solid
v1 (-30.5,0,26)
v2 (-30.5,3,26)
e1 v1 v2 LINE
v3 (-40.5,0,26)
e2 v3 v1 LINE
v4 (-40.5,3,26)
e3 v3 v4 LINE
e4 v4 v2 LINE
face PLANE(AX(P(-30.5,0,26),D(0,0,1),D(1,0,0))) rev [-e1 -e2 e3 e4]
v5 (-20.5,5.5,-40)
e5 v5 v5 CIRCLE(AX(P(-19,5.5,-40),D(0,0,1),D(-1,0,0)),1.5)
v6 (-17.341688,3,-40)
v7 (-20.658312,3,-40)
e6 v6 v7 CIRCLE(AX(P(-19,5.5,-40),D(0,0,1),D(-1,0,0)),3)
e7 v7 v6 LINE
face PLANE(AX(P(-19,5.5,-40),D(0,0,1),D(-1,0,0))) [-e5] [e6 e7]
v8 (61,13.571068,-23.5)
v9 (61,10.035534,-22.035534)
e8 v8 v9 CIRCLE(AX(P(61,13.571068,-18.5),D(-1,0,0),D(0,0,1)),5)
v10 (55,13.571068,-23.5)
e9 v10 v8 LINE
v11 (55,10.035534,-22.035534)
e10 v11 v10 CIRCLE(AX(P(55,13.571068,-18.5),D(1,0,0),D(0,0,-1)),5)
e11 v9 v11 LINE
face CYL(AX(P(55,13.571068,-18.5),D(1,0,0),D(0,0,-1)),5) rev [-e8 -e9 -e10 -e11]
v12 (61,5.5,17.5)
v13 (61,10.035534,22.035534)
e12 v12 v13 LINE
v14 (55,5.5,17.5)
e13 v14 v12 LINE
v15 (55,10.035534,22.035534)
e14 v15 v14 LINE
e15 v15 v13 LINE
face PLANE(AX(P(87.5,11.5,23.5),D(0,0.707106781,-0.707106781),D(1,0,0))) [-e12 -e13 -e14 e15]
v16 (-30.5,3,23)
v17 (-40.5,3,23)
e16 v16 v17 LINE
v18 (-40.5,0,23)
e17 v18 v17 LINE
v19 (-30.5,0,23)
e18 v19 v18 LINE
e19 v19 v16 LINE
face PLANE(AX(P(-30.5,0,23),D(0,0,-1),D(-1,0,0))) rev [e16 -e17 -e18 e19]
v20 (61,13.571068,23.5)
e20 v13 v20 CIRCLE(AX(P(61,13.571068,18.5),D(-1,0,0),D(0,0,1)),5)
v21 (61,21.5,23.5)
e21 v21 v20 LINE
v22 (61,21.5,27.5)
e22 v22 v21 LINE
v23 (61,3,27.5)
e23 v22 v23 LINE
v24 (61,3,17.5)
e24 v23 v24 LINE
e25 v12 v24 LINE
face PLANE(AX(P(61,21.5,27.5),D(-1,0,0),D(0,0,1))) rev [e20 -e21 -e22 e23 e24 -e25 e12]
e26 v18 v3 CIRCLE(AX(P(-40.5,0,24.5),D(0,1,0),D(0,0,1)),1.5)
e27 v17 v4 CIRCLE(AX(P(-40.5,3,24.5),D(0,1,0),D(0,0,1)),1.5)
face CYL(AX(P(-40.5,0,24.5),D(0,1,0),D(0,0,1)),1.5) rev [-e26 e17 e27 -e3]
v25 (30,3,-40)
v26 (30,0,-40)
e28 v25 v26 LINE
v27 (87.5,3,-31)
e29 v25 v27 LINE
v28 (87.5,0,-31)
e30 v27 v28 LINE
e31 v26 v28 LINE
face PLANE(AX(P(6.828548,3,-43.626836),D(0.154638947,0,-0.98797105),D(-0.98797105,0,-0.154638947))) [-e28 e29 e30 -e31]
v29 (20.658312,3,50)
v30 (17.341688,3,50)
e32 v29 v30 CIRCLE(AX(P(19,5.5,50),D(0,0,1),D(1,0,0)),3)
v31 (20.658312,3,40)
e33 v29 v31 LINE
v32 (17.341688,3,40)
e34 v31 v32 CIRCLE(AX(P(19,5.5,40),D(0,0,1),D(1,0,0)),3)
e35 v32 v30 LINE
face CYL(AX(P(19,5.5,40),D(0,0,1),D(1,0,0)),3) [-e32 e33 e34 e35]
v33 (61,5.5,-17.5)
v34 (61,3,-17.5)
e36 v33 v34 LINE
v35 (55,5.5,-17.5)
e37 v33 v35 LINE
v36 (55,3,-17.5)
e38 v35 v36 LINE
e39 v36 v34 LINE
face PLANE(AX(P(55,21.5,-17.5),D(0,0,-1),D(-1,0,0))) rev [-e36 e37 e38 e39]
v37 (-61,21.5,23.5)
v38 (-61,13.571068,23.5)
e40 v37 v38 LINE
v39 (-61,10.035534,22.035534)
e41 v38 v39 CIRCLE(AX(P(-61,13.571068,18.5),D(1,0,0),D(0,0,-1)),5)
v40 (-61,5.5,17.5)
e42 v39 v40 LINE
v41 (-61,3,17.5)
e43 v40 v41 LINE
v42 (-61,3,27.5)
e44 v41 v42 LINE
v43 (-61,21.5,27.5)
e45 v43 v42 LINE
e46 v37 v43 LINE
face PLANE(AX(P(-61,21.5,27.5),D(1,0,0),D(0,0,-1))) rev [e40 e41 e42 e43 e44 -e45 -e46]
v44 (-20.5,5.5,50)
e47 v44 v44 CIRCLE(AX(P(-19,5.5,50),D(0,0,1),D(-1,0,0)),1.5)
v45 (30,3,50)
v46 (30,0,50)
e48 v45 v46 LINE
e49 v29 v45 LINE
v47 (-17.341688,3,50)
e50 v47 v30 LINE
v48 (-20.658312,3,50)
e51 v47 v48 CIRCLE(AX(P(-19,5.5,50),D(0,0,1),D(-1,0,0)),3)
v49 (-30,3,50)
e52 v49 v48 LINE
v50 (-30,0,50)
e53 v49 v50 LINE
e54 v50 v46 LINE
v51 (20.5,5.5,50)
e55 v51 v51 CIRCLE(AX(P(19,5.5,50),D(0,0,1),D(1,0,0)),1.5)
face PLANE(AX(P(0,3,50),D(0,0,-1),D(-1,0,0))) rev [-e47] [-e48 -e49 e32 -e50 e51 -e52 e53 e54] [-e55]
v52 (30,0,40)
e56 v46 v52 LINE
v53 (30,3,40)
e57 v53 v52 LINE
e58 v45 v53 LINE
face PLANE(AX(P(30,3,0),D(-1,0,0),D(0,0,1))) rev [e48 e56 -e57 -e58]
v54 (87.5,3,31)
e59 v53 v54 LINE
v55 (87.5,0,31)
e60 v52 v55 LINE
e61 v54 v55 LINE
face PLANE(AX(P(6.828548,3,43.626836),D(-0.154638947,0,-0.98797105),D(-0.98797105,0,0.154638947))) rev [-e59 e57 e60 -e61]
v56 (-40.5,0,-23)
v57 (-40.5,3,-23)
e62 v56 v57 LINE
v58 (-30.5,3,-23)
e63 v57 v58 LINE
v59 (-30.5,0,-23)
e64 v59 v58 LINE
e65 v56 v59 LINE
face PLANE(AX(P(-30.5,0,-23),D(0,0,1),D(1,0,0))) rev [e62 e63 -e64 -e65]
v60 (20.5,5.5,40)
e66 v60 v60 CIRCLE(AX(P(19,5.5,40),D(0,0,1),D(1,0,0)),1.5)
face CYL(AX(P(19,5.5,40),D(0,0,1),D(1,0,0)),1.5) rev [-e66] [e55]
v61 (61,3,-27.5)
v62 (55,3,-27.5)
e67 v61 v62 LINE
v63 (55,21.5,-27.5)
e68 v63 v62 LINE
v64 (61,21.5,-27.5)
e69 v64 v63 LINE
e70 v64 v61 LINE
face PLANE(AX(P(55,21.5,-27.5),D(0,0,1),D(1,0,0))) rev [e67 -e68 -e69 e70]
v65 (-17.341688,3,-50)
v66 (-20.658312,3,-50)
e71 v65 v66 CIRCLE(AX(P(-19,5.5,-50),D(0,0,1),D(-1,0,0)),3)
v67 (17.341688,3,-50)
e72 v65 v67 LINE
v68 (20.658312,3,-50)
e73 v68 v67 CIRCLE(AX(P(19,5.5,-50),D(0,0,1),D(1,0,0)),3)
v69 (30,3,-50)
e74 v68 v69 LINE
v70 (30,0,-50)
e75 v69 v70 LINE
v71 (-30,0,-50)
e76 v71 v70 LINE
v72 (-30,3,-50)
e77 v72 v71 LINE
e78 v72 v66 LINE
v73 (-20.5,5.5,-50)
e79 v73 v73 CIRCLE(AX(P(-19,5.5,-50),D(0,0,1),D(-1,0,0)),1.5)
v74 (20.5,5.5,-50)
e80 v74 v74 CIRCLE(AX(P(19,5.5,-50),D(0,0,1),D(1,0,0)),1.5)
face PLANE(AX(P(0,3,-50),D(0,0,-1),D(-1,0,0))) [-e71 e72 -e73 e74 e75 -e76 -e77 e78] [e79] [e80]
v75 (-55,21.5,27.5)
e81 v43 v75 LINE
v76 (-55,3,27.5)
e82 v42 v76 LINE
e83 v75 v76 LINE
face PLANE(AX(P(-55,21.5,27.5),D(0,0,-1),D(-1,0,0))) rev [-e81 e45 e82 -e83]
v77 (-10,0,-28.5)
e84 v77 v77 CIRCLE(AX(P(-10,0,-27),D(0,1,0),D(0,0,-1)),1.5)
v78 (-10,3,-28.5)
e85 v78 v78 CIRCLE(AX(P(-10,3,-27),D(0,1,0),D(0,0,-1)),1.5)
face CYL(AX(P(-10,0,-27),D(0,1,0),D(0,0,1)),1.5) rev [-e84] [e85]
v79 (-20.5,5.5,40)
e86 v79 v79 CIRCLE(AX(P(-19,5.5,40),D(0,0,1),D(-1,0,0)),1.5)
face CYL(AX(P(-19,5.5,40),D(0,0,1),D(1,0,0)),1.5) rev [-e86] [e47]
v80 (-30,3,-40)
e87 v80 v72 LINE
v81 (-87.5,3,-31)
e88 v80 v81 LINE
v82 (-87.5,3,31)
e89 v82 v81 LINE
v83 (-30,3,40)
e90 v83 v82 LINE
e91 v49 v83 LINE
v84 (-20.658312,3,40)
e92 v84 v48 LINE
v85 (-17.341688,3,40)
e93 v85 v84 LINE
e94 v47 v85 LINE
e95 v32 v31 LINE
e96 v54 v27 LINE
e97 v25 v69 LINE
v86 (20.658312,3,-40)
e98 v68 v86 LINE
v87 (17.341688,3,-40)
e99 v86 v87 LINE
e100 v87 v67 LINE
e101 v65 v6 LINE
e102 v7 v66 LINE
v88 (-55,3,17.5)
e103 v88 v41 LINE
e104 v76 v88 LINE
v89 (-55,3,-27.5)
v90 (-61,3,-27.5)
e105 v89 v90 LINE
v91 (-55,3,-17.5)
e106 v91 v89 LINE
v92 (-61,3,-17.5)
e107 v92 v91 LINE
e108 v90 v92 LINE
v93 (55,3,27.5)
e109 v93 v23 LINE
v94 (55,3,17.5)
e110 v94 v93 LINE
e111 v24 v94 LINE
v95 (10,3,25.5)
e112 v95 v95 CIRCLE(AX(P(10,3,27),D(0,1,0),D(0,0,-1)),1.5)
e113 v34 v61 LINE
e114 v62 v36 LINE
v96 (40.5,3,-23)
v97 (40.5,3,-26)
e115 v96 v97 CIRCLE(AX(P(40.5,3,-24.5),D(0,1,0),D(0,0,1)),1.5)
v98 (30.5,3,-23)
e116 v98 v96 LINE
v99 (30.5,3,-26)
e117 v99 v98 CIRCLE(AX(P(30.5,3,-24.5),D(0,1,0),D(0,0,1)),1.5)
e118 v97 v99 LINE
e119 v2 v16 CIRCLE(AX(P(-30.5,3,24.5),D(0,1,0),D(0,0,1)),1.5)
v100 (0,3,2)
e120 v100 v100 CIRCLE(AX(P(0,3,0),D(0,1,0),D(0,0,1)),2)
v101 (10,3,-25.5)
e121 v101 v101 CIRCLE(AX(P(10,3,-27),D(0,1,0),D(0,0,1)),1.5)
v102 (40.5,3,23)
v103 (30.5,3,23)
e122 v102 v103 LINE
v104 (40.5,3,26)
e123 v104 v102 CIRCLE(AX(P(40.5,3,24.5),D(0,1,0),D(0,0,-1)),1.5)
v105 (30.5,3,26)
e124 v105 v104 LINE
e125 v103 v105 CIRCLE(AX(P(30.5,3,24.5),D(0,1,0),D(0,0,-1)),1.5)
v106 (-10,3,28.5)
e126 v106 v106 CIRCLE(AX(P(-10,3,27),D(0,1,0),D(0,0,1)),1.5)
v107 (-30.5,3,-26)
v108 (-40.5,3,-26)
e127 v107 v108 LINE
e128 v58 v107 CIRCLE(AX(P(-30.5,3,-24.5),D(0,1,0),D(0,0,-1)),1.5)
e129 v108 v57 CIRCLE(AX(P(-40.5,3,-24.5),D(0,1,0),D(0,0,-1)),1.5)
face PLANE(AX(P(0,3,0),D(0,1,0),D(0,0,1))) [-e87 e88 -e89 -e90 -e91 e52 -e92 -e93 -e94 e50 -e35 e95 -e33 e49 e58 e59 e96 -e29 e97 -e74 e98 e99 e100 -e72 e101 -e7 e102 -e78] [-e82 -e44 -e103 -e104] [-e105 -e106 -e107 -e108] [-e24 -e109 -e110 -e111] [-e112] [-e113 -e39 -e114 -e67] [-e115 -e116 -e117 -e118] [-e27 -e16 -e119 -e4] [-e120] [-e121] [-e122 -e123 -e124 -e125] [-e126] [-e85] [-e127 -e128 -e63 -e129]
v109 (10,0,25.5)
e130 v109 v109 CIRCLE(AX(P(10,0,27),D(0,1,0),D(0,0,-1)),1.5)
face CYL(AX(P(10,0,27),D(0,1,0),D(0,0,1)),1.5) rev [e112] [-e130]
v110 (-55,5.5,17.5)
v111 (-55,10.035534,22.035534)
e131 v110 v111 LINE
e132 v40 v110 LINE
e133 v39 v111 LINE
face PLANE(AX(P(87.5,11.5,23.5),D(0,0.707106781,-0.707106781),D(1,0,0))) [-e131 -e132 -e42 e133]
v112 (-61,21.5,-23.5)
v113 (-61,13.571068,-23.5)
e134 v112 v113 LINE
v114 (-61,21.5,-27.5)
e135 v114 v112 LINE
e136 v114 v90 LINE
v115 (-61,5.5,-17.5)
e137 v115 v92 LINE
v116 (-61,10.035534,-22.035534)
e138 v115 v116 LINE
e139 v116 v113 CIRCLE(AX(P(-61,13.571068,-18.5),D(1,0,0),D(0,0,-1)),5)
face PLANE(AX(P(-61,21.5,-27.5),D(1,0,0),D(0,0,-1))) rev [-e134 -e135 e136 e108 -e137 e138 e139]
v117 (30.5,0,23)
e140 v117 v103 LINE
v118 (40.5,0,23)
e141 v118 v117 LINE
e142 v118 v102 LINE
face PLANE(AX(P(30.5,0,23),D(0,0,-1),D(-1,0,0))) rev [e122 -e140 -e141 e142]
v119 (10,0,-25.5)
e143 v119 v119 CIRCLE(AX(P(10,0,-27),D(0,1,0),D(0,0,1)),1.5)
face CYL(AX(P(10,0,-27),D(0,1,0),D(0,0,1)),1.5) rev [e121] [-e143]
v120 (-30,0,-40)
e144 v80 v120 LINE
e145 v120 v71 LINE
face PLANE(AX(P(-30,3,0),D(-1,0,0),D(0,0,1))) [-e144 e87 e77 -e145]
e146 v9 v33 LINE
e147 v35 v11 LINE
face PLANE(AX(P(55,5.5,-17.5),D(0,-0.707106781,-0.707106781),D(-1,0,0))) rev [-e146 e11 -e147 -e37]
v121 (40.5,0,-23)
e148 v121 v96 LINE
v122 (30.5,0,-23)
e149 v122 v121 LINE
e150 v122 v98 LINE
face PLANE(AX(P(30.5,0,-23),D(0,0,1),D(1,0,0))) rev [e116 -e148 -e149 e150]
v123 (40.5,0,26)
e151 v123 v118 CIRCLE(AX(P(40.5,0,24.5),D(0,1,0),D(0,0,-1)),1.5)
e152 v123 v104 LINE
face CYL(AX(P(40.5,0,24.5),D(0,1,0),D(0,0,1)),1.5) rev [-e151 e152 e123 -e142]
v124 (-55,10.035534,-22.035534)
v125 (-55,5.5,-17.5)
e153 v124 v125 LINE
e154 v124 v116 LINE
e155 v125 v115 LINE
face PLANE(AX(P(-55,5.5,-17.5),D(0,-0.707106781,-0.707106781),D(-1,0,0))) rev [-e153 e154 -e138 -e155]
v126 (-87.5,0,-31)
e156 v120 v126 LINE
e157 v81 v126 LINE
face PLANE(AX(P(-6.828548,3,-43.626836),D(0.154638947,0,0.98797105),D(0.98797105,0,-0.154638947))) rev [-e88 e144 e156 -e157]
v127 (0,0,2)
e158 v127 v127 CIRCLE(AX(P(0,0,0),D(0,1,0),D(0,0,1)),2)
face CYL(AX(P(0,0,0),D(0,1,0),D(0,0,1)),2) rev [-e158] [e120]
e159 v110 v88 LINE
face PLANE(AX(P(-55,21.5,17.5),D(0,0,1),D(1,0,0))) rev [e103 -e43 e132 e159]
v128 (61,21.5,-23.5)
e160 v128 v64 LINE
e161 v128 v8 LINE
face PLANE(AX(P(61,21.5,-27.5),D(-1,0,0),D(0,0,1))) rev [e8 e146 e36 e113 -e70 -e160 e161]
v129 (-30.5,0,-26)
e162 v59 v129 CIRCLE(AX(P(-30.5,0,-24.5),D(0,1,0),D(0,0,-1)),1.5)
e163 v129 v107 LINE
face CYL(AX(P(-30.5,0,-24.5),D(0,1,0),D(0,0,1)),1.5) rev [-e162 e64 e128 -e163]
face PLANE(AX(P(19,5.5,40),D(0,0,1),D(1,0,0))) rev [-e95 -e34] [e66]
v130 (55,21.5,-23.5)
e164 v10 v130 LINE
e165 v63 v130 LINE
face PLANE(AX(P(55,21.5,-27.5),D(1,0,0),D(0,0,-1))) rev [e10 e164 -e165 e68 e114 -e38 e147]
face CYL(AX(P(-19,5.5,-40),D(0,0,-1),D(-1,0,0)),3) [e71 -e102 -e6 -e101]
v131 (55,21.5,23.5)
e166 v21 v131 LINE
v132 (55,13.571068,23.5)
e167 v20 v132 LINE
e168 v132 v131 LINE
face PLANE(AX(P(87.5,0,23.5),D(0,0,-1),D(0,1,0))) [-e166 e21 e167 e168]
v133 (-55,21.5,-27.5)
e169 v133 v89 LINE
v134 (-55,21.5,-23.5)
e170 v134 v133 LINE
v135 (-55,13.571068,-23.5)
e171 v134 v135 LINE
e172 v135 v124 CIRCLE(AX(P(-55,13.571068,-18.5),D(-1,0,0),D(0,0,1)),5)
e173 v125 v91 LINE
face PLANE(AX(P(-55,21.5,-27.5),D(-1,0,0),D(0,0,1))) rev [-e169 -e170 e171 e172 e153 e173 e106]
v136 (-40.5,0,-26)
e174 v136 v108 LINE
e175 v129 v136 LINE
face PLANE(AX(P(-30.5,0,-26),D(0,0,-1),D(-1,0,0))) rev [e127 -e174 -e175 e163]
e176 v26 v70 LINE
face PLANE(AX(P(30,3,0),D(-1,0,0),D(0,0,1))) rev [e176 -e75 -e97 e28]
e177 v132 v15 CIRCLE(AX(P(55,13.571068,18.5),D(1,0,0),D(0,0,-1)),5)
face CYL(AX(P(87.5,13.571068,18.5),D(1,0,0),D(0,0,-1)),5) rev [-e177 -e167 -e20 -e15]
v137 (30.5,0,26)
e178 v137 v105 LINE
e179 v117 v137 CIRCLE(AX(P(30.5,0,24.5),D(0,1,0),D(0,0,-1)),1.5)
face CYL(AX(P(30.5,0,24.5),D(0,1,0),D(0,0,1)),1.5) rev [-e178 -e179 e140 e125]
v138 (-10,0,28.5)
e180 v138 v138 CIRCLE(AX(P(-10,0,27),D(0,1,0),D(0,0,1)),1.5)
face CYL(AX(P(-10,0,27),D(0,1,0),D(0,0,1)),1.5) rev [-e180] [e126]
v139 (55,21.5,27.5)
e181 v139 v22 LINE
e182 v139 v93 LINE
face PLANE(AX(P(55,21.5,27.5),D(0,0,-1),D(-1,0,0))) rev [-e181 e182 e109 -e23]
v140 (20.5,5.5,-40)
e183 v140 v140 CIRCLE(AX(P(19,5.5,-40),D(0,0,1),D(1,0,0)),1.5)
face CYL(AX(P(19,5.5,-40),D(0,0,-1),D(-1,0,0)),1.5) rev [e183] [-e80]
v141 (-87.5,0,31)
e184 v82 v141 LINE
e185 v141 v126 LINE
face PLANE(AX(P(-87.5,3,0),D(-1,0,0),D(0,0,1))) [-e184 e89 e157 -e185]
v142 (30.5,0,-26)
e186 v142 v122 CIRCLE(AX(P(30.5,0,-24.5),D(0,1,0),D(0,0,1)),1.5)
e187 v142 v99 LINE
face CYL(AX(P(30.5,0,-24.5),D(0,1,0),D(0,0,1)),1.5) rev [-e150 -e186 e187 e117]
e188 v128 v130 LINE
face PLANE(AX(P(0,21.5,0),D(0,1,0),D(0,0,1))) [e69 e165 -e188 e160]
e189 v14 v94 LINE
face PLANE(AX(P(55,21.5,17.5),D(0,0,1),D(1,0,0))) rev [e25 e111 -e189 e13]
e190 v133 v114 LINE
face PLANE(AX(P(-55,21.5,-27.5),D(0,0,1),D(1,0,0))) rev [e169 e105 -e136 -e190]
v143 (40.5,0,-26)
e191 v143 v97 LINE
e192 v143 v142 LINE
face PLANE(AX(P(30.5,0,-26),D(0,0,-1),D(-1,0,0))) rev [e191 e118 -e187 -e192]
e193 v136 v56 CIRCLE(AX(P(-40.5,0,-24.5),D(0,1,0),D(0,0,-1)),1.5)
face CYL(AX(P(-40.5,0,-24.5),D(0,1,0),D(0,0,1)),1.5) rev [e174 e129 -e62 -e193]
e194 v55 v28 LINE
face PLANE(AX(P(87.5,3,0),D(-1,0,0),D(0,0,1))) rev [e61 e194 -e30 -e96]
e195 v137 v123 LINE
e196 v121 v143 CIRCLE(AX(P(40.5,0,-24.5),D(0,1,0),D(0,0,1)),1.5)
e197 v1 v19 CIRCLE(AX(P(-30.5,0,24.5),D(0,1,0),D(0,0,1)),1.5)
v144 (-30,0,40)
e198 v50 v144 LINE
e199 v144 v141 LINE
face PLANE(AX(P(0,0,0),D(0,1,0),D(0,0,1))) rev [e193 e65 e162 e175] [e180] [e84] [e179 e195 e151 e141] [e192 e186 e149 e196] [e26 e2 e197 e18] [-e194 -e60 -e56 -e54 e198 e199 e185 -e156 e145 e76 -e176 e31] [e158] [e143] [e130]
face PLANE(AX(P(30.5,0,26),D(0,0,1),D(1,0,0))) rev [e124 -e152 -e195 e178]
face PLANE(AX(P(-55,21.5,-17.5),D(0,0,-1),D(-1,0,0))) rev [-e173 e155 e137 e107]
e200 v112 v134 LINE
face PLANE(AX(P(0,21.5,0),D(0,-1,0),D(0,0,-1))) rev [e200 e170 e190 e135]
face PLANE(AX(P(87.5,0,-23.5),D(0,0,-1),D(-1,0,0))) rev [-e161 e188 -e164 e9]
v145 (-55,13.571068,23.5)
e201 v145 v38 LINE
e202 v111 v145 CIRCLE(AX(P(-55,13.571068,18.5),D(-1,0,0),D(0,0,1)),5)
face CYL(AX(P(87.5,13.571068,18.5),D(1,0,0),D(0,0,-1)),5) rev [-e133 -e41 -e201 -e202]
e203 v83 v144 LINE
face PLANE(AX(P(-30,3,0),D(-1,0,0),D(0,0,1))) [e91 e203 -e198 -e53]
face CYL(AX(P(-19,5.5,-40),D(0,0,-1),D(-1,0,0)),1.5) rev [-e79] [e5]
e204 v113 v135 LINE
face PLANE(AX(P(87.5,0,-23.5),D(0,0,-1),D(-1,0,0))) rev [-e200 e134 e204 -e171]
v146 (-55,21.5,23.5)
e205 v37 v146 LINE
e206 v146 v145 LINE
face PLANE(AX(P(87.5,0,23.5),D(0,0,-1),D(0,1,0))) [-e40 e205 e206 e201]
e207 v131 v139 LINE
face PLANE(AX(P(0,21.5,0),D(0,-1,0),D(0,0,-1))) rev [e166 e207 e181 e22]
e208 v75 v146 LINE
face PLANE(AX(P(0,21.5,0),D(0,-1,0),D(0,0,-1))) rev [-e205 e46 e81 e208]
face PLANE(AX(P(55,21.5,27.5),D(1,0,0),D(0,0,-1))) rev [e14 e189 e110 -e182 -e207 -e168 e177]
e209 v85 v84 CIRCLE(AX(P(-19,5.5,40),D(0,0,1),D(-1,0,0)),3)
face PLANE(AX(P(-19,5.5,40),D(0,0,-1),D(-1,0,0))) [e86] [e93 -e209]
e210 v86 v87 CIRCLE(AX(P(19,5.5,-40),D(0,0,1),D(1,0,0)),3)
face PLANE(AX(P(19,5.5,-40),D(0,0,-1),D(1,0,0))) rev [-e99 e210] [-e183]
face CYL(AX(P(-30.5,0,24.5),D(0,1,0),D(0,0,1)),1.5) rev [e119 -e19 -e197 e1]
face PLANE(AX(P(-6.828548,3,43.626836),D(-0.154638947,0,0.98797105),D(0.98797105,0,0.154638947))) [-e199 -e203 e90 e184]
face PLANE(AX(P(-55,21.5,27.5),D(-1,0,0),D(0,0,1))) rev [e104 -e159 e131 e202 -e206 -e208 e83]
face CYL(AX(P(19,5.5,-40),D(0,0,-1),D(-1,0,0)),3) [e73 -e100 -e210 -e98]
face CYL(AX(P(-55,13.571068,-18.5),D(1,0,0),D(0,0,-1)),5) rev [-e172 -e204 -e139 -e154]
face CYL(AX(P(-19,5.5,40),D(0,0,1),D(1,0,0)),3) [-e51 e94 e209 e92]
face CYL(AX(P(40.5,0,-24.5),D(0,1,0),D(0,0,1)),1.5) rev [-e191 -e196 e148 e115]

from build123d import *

# Parameters (mm, degrees)
BOSS_EXTRUDE1_DEPTH = 3
SKETCH2_R           = 3
SKETCH2_R_2         = 1.5
BOSS_EXTRUDE2_DEPTH = 10
SKETCH3_R           = 2
SKETCH3_R_2         = 1.5
CUT_EXTRUDE1_DEPTH  = 101.928192295
SKETCH4_W           = 6
SKETCH4_H           = 10
BOSS_EXTRUDE3_DEPTH = 18.5
SKETCH5_W           = 6
SKETCH5_H           = 10
CUT_EXTRUDE2_DEPTH  = 159.159729388
CHAMFER1_SIZE       = 6
FILLET1_START       = -61
FILLET1_DEPTH       = 6
FILLET1_START_2     = 55
FILLET1_2_DEPTH     = 6


with BuildPart() as part:
    # Sketch1 → Boss-Extrude1 (new body)
    with BuildSketch(Plane(origin=(0, 0, 0), x_dir=(1, 0, 0), z_dir=(0, 1, 0))):
        Polygon((30, -50), (30, -40), (30, 40), (30, 50), (-30, 50), (-30, 40), (-30, -40), (-30, -50), align=None)
        Polygon((-87.5, -31), (-30, -40), (-30, 40), (-87.5, 31), align=None)
        Polygon((30, 40), (30, -40), (87.5, -31), (87.5, 31), align=None)
    extrude(amount=BOSS_EXTRUDE1_DEPTH)

    # Sketch2 → Boss-Extrude2 (add)
    # profile 1 of 2: a face of its own
    with BuildSketch(Plane.XY.offset(50)):
        with Locations((19, 5.5)):
            Circle(SKETCH2_R)
        with Locations((19, 5.5)):
            Circle(SKETCH2_R_2, mode=Mode.SUBTRACT)
    # profile 2 of 2: a face of its own
    with BuildSketch(Plane.XY.offset(50)):
        with Locations((-19, 5.5)):
            Circle(SKETCH2_R)
        with Locations(Location((-19, 5.5, 0), (0, 0, 180))):
            Circle(SKETCH2_R_2, mode=Mode.SUBTRACT)
    boss_extrude2 = extrude(amount=-BOSS_EXTRUDE2_DEPTH)

    # Mirror1: Boss-Extrude2 across plane
    add(boss_extrude2.mirror(Plane.XY))

    # Sketch3 → Cut-Extrude1 (cut, through all)
    with BuildSketch(Plane(origin=(0, 3, 0), x_dir=(1, 0, 0), z_dir=(0, 1, 0))):
        with Locations(Location((0, 0, 0), (0, 0, 270))):
            Circle(SKETCH3_R)
        with Locations(Location((10, 27, 0), (0, 0, 270))):
            Circle(SKETCH3_R_2)
        with Locations(Location((-10, 27, 0), (0, 0, 90))):
            Circle(SKETCH3_R_2)
        with Locations(Location((10, -27, 0), (0, 0, 90))):
            Circle(SKETCH3_R_2)
        with Locations(Location((-10, -27, 0), (0, 0, 270))):
            Circle(SKETCH3_R_2)
        with BuildLine():
            Line((30.5, 26), (40.5, 26))
            ThreePointArc((40.5, 26), (42, 24.5), (40.5, 23))
            Line((40.5, 23), (30.5, 23))
            ThreePointArc((30.5, 23), (29, 24.5), (30.5, 26))
        make_face()
        with BuildLine():
            Line((-30.5, 26), (-40.5, 26))
            ThreePointArc((-40.5, 26), (-42, 24.5), (-40.5, 23))
            Line((-40.5, 23), (-30.5, 23))
            ThreePointArc((-30.5, 23), (-29, 24.5), (-30.5, 26))
        make_face()
        with BuildLine():
            Line((30.5, -26), (40.5, -26))
            ThreePointArc((40.5, -26), (42, -24.5), (40.5, -23))
            Line((40.5, -23), (30.5, -23))
            ThreePointArc((30.5, -23), (29, -24.5), (30.5, -26))
        make_face()
        with BuildLine():
            Line((-30.5, -26), (-40.5, -26))
            ThreePointArc((-40.5, -26), (-42, -24.5), (-40.5, -23))
            Line((-40.5, -23), (-30.5, -23))
            ThreePointArc((-30.5, -23), (-29, -24.5), (-30.5, -26))
        make_face()
    extrude(amount=-CUT_EXTRUDE1_DEPTH, mode=Mode.SUBTRACT)

    # Sketch4 → Boss-Extrude3 (add)
    with BuildSketch(Plane(origin=(0, 3, 0), x_dir=(1, 0, 0), z_dir=(0, 1, 0))):
        with Locations((58, 22.5)):
            Rectangle(SKETCH4_W, SKETCH4_H)
        with Locations((58, -22.5)):
            Rectangle(SKETCH4_W, SKETCH4_H)
        with Locations((-58, -22.5)):
            Rectangle(SKETCH4_W, SKETCH4_H)
        with Locations((-58, 22.5)):
            Rectangle(SKETCH4_W, SKETCH4_H)
    extrude(amount=BOSS_EXTRUDE3_DEPTH)

    # Sketch5 → Cut-Extrude2 (cut, through all)
    with BuildSketch(Plane.ZY.offset(61)):
        with Locations((-20.5, 16.5)):
            Rectangle(SKETCH5_W, SKETCH5_H)
        with Locations((20.5, 16.5)):
            Rectangle(SKETCH5_W, SKETCH5_H)
    extrude(amount=-CUT_EXTRUDE2_DEPTH, mode=Mode.SUBTRACT)

    # Chamfer1
    chamfer1_edges = [part.edges().sort_by_distance(p)[0] for p in [
        (58, 11.5, 17.5),
        (-58, 11.5, 17.5),
        (58, 11.5, -17.5),
        (-58, 11.5, -17.5),
    ]]
    chamfer(chamfer1_edges, length=CHAMFER1_SIZE - 0.0001)  # a hair under: the kernel refuses the full size

    # Fillet1: read off the stored shape, not the designer's step
    # Fillet1 outline → Fillet1 (add)
    with BuildSketch(Plane.YZ.offset(FILLET1_START)):
        with BuildLine():
            ThreePointArc((13.571067812, -23.5), (11.65765065, -23.119397663), (10.035533906, -22.035533906))
            Line((10.035533906, -22.035533906), (11.5, -23.5))
            Line((11.5, -23.5), (13.571067812, -23.5))
        make_face()
        with BuildLine():
            ThreePointArc((10.035533906, 22.035533906), (11.65765065, 23.119397663), (13.571067812, 23.5))
            Line((13.571067812, 23.5), (11.5, 23.5))
            Line((11.5, 23.5), (10.035533906, 22.035533906))
        make_face()
    extrude(amount=FILLET1_DEPTH)

    # Fillet1 2 outline → Fillet1 2 (add)
    with BuildSketch(Plane.YZ.offset(FILLET1_START_2)):
        with BuildLine():
            ThreePointArc((13.571067812, -23.5), (11.65765065, -23.119397663), (10.035533906, -22.035533906))
            Line((10.035533906, -22.035533906), (11.5, -23.5))
            Line((11.5, -23.5), (13.571067812, -23.5))
        make_face()
        with BuildLine():
            ThreePointArc((10.035533906, 22.035533906), (11.65765065, 23.119397663), (13.571067812, 23.5))
            Line((13.571067812, 23.5), (11.5, 23.5))
            Line((11.5, 23.5), (10.035533906, 22.035533906))
        make_face()
    extrude(amount=FILLET1_2_DEPTH)


solid = part.part
